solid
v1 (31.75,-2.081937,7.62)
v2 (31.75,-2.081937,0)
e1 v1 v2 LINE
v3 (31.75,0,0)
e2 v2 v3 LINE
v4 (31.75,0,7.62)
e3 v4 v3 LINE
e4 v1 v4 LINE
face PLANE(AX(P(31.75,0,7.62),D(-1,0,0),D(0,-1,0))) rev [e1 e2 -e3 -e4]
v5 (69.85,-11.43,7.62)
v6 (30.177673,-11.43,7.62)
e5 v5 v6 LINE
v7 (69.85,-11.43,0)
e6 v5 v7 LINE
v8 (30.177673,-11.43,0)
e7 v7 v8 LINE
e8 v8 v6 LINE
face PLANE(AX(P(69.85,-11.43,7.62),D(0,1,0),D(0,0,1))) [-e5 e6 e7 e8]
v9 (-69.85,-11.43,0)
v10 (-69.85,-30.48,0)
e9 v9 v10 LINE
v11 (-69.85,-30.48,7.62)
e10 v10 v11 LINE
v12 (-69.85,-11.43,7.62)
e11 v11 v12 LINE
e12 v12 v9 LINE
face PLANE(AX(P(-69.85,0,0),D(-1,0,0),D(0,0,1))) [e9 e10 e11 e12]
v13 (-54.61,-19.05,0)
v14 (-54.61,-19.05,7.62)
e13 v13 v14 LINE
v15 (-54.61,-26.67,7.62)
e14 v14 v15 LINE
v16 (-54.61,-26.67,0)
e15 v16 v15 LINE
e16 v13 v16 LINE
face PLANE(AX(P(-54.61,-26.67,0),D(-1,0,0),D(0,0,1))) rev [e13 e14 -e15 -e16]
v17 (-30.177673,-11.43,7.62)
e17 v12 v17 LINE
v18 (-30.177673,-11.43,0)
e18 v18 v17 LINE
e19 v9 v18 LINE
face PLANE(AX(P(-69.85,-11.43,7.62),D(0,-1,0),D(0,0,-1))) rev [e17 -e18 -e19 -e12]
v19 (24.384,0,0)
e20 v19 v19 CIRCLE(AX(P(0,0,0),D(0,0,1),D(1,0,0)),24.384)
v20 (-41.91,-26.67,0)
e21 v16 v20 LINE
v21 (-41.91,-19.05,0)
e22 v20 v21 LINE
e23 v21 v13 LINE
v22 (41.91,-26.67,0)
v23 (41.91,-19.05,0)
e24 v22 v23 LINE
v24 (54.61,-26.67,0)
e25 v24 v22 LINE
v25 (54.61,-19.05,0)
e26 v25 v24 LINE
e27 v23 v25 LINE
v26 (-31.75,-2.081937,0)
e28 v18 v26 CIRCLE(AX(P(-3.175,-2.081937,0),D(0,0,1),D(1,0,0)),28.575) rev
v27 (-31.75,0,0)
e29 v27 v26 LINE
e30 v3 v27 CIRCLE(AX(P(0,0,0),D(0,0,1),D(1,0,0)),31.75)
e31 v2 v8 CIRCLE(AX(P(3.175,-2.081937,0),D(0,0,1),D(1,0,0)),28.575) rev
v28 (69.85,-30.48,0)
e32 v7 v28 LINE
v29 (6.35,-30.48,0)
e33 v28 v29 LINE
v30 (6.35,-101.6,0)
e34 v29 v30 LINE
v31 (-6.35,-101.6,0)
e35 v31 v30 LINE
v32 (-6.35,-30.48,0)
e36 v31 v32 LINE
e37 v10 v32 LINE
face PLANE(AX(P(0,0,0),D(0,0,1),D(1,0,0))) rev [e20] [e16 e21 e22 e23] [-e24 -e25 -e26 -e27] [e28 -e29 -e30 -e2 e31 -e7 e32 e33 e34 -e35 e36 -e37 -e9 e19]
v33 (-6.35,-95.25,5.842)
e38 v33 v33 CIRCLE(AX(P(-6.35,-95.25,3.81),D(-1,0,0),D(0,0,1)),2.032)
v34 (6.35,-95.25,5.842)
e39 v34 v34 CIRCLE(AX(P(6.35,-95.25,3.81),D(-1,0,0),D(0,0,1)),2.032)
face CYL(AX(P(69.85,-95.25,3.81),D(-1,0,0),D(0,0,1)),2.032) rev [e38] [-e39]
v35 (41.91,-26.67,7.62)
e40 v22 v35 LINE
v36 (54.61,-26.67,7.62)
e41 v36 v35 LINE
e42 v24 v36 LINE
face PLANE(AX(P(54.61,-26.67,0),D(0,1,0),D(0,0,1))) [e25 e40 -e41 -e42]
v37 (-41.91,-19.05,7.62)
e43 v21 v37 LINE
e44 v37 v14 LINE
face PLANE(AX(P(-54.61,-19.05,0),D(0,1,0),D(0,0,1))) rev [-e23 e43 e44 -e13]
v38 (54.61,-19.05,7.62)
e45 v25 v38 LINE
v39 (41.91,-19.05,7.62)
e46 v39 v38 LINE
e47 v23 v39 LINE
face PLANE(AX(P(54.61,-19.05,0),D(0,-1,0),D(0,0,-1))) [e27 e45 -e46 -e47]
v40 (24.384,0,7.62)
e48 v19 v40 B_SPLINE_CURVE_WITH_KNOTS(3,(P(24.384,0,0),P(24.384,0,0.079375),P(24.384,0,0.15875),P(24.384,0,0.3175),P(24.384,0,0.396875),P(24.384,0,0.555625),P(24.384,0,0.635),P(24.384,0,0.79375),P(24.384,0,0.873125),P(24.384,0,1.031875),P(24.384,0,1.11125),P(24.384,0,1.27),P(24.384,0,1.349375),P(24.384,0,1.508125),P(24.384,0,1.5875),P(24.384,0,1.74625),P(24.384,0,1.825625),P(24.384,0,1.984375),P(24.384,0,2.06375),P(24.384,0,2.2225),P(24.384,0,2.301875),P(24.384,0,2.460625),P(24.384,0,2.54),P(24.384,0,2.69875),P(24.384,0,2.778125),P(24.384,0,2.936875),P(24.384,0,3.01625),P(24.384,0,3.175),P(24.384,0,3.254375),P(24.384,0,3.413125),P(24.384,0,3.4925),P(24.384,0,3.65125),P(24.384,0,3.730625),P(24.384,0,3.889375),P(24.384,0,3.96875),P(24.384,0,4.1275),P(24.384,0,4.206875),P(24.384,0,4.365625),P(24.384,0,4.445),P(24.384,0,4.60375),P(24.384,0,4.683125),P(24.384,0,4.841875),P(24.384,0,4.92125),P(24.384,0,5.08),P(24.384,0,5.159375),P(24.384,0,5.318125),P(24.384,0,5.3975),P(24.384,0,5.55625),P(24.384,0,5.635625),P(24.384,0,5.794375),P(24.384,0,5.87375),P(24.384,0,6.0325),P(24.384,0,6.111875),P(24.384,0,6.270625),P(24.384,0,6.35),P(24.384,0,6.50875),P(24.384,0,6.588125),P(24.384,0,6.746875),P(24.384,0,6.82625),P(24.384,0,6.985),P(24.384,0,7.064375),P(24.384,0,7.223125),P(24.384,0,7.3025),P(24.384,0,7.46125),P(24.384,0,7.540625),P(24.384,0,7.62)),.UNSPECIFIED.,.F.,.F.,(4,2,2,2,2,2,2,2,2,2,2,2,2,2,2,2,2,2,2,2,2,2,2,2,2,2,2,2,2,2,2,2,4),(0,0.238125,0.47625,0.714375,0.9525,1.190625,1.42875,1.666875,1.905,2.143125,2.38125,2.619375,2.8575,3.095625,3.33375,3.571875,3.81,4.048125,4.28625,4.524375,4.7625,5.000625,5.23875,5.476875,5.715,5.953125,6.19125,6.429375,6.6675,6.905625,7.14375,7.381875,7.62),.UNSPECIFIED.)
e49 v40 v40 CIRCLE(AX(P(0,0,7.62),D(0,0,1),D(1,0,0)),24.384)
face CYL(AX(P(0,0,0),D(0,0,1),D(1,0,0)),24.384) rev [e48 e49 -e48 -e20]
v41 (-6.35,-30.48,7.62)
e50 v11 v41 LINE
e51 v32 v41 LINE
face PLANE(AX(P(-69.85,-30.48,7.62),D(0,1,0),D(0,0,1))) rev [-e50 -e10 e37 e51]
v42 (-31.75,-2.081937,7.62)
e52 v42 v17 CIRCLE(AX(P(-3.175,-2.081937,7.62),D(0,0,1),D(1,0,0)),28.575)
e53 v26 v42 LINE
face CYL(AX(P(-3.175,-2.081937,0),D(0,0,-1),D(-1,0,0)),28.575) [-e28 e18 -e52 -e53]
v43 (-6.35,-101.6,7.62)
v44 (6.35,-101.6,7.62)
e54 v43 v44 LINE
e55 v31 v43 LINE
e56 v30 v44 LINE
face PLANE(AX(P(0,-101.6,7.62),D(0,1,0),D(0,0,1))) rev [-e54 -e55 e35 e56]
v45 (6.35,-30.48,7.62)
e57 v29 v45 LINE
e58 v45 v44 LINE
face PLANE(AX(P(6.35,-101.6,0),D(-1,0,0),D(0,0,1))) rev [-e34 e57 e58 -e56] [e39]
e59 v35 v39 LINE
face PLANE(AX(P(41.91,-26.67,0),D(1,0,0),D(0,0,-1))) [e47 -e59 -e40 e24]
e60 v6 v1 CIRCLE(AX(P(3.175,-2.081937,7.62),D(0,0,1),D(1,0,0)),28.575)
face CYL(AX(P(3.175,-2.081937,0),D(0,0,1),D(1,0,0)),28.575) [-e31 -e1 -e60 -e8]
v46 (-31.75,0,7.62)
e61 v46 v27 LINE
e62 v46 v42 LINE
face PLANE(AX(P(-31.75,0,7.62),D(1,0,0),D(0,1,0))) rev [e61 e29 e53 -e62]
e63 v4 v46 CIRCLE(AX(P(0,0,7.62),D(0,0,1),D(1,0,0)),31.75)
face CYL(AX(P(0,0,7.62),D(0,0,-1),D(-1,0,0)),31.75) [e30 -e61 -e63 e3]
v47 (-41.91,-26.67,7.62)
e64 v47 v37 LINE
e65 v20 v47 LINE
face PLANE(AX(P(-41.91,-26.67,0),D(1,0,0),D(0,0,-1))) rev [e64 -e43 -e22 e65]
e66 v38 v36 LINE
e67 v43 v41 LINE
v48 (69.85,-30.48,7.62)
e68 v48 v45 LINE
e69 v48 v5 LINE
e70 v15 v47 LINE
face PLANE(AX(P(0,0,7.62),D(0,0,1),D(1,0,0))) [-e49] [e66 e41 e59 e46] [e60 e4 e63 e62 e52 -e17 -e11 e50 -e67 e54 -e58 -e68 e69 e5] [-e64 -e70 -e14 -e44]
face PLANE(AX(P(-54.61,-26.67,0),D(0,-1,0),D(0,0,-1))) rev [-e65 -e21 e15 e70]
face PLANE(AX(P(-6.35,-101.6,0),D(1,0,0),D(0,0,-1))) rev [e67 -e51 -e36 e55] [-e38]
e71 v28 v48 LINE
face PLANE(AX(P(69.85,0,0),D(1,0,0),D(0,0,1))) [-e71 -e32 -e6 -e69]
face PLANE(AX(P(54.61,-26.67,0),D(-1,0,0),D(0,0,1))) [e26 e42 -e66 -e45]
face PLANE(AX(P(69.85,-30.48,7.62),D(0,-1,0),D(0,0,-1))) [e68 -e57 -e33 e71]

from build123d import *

# Parameters (mm, degrees)
SKETCH1_R           = 31.75
BOSS_EXTRUDE1_DEPTH = 7.62
BOSS_EXTRUDE2_START = -7.62
SKETCH2_W           = 63.5
SKETCH2_H           = 101.6
BOSS_EXTRUDE2_DEPTH = 7.62
SKETCH4_W           = 25.4
SKETCH4_H           = 71.12
CUT_EXTRUDE2_DEPTH  = 107.717790925
FILLET1_R           = 28.575
SKETCH6_W           = 7.62
SKETCH6_H           = 19.05
BOSS_EXTRUDE3_DEPTH = 63.5
SKETCH5_R           = 2.032
CUT_EXTRUDE3_DEPTH  = 128.22839463
SKETCH3_R           = 24.384
CUT_EXTRUDE1_DEPTH  = 7.62
SKETCH7_W           = 12.7
SKETCH7_H           = 7.62
CUT_EXTRUDE4_DEPTH  = 124.529943334


with BuildPart() as part:
    # Sketch1 → Boss-Extrude1 (new body)
    with BuildSketch(Plane.XY):
        with Locations(Location((0, 0, 0), (0, 0, 180))):
            Circle(SKETCH1_R)
    extrude(amount=BOSS_EXTRUDE1_DEPTH)

    # Sketch2 → Boss-Extrude2 (add)
    with BuildSketch(Plane.XY.offset(7.62).offset(BOSS_EXTRUDE2_START)):
        with Locations((0, -50.8)):
            Rectangle(SKETCH2_W, SKETCH2_H)
    extrude(amount=BOSS_EXTRUDE2_DEPTH)

    # Sketch4 → Cut-Extrude2 (cut, through all)
    with BuildSketch(Plane.XY.offset(7.62)):
        with Locations((-19.05, -66.04)):
            Rectangle(SKETCH4_W, SKETCH4_H)
        with Locations((19.05, -66.04)):
            Rectangle(SKETCH4_W, SKETCH4_H)
    extrude(amount=-CUT_EXTRUDE2_DEPTH, mode=Mode.SUBTRACT)

    # Fillet1
    # the kernel refuses this fillet: 28.575 mm, written as the material it takes off along each edge
    with BuildSketch(Plane(origin=(31.75, -30.48, 78.615158286), x_dir=(0, 1, 0), z_dir=(0, 0, -1))) as fillet1_piece_1:
        with BuildLine():
            CenterArc((28.398063314, -28.575), FILLET1_R, 90, 83.620629792)
            Line((0, -25.4), (-0.567961266, -25.3365))
            ThreePointArc((-0.567961266, -25.3365), (-0.5715, -12.7), (-0.5715, 0))
            Line((-0.5715, 0), (0, 0.5715))
            Line((0, 0.5715), (28.398063314, 0.5715))
            Line((28.398063314, 0.5715), (28.398063314, 0))
        make_face()
    extrude(amount=149.610316571, mode=Mode.SUBTRACT)
    with BuildSketch(Plane(origin=(-31.75, -30.48, 78.615158286), x_dir=(1, 0, 0), z_dir=(0, 0, -1))) as fillet1_piece_2:
        with BuildLine():
            CenterArc((28.575, -28.398063314), FILLET1_R, 96.379370208, 83.620629792)
            Line((0, -28.398063314), (-0.5715, -28.398063314))
            Line((-0.5715, -28.398063314), (-0.5715, 0))
            Line((-0.5715, 0), (0, 0.5715))
            ThreePointArc((0, 0.5715), (12.7, 0.5715), (25.3365, 0.567961266))
            Line((25.3365, 0.567961266), (25.4, 0))
        make_face()
    extrude(amount=149.610316571, mode=Mode.SUBTRACT)

    # Sketch6 → Boss-Extrude3 (add)
    with BuildSketch(Plane.ZY.offset(6.35)):
        with Locations((3.81, -20.955)):
            Rectangle(SKETCH6_W, SKETCH6_H)
    boss_extrude3 = extrude(amount=BOSS_EXTRUDE3_DEPTH)

    # Mirror1: Boss-Extrude3 across plane
    add(boss_extrude3.mirror(Plane(origin=(0, 0, 0), x_dir=(0, 0, 1), z_dir=(1, 0, 0))))

    # Sketch5 → Cut-Extrude3 (cut, through all)
    with BuildSketch(Plane.ZY.offset(6.35)):
        with Locations((3.81, -95.25)):
            Circle(SKETCH5_R)
    extrude(amount=-CUT_EXTRUDE3_DEPTH, mode=Mode.SUBTRACT)

    # Sketch3 → Cut-Extrude1 (cut)
    with BuildSketch(Plane.XY.offset(7.62)):
        Circle(SKETCH3_R)
    extrude(amount=-CUT_EXTRUDE1_DEPTH, mode=Mode.SUBTRACT)

    # Sketch7 → Cut-Extrude4 (cut, through all)
    with BuildSketch(Plane.XY.offset(7.62)):
        with Locations((-48.26, -22.86)):
            Rectangle(SKETCH7_W, SKETCH7_H)
    cut_extrude4 = extrude(amount=-CUT_EXTRUDE4_DEPTH, mode=Mode.SUBTRACT)

    # Mirror2: Cut-Extrude4 across plane
    add(cut_extrude4.mirror(Plane(origin=(0, 0, 0), x_dir=(0, 0, 1), z_dir=(1, 0, 0))), mode=Mode.SUBTRACT)


solid = part.part
